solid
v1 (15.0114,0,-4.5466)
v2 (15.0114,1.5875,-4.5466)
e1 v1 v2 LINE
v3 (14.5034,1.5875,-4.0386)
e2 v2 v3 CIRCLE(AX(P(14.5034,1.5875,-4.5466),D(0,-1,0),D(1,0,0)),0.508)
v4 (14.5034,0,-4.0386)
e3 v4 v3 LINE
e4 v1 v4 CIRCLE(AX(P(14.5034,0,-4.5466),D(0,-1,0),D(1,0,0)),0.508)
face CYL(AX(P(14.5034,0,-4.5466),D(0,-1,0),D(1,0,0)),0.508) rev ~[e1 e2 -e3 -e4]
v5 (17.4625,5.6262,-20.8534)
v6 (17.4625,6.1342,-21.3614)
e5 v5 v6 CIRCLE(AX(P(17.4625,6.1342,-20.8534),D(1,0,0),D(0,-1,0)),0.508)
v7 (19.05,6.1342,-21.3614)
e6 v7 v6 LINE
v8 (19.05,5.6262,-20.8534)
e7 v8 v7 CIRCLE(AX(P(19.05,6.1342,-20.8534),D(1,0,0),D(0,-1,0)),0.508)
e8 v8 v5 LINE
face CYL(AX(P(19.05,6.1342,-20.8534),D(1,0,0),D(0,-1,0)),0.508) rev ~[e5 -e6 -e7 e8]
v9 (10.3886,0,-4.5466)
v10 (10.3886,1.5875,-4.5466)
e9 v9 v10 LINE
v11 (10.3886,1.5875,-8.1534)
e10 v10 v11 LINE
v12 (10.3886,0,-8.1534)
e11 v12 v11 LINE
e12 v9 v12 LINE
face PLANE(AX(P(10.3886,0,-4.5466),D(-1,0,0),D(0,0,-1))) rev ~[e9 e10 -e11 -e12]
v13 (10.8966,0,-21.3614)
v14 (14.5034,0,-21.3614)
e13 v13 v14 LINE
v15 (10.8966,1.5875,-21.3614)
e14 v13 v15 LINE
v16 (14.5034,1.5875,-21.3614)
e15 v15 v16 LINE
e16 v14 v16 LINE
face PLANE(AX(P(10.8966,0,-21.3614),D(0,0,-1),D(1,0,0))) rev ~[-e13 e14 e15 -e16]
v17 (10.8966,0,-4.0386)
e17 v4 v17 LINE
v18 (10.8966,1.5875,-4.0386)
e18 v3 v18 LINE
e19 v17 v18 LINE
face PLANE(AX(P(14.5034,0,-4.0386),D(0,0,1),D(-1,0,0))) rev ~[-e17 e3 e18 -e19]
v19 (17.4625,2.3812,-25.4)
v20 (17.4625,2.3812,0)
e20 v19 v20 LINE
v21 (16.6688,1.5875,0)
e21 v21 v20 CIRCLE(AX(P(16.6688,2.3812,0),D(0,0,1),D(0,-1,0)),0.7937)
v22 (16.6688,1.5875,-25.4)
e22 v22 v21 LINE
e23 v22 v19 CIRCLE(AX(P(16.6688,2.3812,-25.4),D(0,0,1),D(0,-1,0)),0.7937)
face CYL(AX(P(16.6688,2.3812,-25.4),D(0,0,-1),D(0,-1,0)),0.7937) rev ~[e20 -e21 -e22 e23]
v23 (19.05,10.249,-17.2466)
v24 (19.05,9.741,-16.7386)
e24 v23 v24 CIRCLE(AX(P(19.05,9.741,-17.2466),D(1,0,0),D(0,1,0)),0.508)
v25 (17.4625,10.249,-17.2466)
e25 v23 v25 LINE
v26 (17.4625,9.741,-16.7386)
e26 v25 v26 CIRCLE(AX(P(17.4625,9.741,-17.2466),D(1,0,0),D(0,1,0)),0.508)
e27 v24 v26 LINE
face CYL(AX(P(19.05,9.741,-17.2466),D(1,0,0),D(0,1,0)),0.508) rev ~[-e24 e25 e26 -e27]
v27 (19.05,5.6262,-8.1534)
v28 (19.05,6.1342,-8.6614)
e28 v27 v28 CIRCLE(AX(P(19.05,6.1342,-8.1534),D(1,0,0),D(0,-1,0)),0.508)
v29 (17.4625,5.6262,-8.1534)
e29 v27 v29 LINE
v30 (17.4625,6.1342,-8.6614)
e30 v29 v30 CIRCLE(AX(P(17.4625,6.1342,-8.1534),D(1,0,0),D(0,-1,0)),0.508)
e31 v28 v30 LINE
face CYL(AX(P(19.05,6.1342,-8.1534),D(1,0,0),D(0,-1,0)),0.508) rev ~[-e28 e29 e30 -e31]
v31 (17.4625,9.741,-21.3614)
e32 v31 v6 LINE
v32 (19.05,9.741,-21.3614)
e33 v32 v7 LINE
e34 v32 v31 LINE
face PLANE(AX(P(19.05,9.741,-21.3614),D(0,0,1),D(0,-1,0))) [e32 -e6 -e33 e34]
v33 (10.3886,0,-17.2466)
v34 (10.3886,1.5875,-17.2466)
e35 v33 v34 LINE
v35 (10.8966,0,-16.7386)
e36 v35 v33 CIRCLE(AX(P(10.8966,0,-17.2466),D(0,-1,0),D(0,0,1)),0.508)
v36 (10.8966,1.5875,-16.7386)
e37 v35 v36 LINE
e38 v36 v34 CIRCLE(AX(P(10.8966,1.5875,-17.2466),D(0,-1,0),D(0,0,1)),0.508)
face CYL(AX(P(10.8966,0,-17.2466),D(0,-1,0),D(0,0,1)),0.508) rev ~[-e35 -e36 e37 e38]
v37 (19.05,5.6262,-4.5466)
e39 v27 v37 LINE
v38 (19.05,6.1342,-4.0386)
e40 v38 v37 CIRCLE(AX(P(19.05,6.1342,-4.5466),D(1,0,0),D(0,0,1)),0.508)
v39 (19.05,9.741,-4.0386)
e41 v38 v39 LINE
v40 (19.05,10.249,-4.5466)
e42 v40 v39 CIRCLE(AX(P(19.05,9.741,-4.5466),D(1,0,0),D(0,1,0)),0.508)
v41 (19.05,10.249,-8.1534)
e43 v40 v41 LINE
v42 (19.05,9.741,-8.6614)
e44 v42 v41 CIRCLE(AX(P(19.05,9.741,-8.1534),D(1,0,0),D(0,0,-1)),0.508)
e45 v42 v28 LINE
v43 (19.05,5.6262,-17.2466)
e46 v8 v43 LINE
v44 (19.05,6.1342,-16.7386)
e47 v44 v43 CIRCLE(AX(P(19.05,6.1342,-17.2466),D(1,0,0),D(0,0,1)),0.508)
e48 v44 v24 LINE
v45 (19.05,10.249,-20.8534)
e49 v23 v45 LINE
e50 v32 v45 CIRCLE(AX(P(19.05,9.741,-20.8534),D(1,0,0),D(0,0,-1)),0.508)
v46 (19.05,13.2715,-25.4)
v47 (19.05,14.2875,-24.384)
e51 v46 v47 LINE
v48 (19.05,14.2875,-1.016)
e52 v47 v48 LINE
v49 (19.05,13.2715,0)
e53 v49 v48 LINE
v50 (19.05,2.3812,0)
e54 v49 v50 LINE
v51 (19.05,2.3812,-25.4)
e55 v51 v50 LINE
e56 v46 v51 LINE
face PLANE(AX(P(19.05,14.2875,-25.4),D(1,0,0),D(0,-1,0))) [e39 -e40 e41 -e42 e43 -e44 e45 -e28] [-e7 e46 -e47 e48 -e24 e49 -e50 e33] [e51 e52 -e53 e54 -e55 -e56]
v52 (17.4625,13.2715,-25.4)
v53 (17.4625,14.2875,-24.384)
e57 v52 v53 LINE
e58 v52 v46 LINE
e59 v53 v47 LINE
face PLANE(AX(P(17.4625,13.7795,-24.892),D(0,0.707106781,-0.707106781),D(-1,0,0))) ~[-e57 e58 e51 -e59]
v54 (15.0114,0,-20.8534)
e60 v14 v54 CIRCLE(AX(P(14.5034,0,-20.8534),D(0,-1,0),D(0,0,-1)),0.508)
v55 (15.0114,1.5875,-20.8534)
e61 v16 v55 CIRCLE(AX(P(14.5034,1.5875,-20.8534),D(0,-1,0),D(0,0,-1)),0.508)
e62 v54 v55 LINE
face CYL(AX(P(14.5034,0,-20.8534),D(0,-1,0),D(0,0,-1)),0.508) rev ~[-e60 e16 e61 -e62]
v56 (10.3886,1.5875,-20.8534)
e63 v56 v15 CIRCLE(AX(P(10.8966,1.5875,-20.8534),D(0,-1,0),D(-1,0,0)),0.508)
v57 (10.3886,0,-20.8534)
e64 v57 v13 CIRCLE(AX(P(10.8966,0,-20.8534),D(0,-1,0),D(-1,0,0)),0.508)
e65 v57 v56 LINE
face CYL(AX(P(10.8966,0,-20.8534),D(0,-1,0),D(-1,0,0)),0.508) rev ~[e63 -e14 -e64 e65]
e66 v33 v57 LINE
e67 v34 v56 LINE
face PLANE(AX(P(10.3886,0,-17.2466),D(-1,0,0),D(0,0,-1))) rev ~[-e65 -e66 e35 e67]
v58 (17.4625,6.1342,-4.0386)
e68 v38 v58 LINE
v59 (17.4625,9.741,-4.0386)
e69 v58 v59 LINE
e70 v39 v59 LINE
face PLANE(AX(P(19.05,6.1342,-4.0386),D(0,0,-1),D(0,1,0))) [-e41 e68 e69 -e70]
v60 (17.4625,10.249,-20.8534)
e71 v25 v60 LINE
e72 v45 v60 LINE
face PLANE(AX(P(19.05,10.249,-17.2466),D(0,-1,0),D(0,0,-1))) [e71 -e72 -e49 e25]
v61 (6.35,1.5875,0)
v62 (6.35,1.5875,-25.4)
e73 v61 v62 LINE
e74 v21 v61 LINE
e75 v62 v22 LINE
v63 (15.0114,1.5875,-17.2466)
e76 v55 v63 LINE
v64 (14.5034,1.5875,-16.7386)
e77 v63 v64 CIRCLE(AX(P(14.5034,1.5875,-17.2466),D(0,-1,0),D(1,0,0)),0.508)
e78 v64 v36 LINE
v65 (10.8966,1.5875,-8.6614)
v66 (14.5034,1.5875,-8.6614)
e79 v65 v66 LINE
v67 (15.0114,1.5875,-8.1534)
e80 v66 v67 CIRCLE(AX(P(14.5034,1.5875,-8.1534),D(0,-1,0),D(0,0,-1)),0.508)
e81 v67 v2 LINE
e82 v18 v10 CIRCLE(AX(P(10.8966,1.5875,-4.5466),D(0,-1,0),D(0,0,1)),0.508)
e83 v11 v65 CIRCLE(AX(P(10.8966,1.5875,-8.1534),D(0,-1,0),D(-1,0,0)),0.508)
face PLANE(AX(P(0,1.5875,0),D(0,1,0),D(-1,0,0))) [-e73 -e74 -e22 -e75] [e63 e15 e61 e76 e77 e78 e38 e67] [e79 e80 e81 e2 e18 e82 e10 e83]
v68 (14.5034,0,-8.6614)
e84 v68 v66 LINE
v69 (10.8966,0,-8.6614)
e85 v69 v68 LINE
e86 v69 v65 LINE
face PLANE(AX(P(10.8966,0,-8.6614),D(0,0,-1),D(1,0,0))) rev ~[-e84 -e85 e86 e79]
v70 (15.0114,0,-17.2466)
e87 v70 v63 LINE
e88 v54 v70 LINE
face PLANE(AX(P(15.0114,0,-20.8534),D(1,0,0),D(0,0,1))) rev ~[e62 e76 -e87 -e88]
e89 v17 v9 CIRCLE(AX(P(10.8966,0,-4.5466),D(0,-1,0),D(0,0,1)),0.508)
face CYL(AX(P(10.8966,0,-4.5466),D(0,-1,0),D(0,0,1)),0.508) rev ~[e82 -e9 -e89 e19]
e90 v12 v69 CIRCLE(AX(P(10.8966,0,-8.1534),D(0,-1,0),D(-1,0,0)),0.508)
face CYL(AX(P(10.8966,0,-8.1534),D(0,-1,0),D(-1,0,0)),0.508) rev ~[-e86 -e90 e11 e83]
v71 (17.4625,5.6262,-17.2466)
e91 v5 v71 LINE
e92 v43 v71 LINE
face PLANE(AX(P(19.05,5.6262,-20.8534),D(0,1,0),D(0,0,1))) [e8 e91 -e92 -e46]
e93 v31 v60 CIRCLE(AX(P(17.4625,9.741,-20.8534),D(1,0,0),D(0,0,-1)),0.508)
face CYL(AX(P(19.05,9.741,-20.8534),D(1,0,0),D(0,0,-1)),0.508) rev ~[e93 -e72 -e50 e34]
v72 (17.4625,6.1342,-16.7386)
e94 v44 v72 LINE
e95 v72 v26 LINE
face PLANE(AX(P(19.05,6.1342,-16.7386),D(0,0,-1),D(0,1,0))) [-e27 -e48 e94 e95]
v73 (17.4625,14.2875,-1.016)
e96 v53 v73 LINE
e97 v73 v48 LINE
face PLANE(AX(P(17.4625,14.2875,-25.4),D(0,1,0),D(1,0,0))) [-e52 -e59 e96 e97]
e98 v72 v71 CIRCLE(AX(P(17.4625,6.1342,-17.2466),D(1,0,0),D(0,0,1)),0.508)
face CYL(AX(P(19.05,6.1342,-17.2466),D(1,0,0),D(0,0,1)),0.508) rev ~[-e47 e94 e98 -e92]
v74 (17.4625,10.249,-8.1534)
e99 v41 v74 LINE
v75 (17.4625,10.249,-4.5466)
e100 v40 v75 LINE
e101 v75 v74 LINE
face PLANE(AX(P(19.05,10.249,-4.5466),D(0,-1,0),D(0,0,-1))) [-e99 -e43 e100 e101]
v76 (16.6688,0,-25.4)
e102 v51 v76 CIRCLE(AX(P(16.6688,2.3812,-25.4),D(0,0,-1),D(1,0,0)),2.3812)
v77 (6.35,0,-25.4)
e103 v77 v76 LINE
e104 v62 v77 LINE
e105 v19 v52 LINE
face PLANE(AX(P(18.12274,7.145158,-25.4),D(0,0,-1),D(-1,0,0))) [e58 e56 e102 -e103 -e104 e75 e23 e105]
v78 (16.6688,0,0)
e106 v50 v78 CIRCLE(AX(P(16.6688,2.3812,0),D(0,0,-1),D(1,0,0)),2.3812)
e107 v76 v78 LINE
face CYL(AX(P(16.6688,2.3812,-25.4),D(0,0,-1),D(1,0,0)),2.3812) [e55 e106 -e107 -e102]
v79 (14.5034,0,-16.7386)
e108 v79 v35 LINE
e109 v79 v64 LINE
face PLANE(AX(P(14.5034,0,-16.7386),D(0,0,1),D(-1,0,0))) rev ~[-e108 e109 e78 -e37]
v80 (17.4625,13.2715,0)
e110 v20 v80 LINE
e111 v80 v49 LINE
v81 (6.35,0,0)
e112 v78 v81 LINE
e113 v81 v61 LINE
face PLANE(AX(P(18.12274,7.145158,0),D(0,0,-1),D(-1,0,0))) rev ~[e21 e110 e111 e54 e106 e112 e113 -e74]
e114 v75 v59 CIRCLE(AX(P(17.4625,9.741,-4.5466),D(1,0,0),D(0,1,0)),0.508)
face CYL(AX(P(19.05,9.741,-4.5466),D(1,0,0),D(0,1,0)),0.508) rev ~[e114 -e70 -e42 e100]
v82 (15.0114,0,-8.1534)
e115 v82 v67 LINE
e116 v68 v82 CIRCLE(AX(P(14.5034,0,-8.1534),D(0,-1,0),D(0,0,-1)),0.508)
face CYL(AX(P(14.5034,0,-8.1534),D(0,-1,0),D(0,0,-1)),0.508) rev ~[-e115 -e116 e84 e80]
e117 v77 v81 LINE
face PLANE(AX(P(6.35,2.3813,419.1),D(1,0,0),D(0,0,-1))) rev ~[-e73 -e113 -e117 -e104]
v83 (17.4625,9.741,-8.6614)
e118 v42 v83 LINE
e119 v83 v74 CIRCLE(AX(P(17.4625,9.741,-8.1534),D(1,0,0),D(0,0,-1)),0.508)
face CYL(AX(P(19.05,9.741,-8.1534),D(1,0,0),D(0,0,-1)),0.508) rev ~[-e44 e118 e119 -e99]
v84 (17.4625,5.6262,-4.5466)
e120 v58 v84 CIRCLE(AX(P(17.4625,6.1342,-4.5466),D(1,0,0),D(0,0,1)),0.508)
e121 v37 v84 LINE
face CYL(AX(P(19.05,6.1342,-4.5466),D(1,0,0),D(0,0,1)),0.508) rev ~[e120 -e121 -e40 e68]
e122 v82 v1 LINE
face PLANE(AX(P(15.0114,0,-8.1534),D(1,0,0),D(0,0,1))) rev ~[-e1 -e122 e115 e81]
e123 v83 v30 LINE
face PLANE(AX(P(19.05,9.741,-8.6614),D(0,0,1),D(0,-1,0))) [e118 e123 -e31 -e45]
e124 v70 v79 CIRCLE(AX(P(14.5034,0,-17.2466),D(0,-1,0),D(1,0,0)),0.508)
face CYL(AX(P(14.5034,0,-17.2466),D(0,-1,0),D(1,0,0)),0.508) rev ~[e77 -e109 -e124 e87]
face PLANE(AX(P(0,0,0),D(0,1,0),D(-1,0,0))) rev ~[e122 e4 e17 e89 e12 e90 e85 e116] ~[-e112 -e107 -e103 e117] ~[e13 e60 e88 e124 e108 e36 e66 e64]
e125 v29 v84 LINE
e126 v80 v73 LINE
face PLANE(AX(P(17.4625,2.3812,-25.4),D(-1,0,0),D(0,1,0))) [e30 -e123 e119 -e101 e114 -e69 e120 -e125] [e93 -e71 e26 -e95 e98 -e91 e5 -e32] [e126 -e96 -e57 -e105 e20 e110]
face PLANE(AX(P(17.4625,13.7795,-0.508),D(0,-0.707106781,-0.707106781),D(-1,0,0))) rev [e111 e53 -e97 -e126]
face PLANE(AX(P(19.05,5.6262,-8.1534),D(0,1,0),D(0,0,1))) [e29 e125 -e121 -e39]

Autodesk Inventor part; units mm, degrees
ref_plane "YZ Plane" through (0, 0, 0) normal (1, 0, 0) x (0, 1, 0)
ref_plane "XZ Plane" through (0, 0, 0) normal (0, 1, 0) x (-1, 0, 0)
sketch "Sketch1" plane through (0, 0, 0) normal (0, 1, 0) x (-1, 0, 0)
  line L0 (-19.05, 0) -> (19.05, 0)
  line L1 (19.05, 0) -> (19.05, -25.4)
  line L2 (19.05, -25.4) -> (-19.05, -25.4)
  line L3 (-19.05, -25.4) -> (-19.05, 0)
  line L4 (19.05, 0) -> (-19.05, -25.4) construction
  point P0 (0, 0)
  point P1 (0, 0)
  dimension "d0" = 38.1
  dimension "d1" = 25.4
extrude "Plate1" add sketch "Sketch1" along normal blind 1.5875
sketch "Sketch2" plane through (17.4625, 0, -25.4) normal (1, 0, 0) x (0, 1, 0)
  line L0 (0, 25.4) -> (0, 0)
  line L1 (0, 0) -> (14.2875, 0)
  line L2 (14.2875, 0) -> (14.2875, 25.4)
  line L3 (14.2875, 25.4) -> (0, 25.4)
edge flange "Flanges" height 12.7 angle 90 thickness 1.5875 bend radius 0.7937 thickness toward (1, 0, 0) relief tear relief width 1.5875 relief depth 0.7937 corner gap 1.5875 corner form 0 edges at (19.05, 1.5875, -12.7) (-19.05, 1.5875, -12.7) wall of the first edge with corners at (17.4625, 0, 0) (17.4625, 0, -25.4) (17.4625, 14.2875, -25.4) (17.4625, 14.2875, 0)
bend "Bend1"
corner "Corner1"
sketch "Sketch3" plane through (19.05, 2.3813, -25.4) normal (1, 0, 0) x (0, 0, -1)
  line L0 (-20.8534, 7.8677) -> (-17.2466, 7.8677)
  line L1 (-16.7386, 7.3597) -> (-16.7386, 3.7529)
  line L2 (-17.2466, 3.2449) -> (-20.8534, 3.2449)
  line L3 (-21.3614, 3.7529) -> (-21.3614, 7.3597)
  arc A0 (-20.8534, 7.8677) -> (-21.3614, 7.3597) centre (-20.8534, 7.3597) ccw
  arc A1 (-16.7386, 7.3597) -> (-17.2466, 7.8677) centre (-17.2466, 7.3597) ccw
  arc A2 (-17.2466, 3.2449) -> (-16.7386, 3.7529) centre (-17.2466, 3.7529) ccw
  arc A3 (-21.3614, 3.7529) -> (-20.8534, 3.2449) centre (-20.8534, 3.7529) ccw
  line L4 (-25.4, 0) -> (-25.4, 11.9063) construction
  line L5 (-25.4, 11.9063) -> (0, 11.9062) construction
  line L6 (-20.8534, 7.3597) -> (-17.2466, 3.7529) construction
  point P0 (-25.4, -2.3812)
  point P1 (-16.7386, 3.2449)
  point P2 (-21.3614, 3.2449)
  point P3 (-19.05, 5.5563)
  dimension "d16" = 4.6228
  dimension "d17" = 0.508
  dimension "d20" = 6.35
  dimension "d21" = 6.35
extrude "Flange Stamp" cut sketch "Sketch3" against normal blind 1.5875
sketch "Sketch7" plane through (19.05, 2.3813, 0) normal (1, 0, 0) x (0, 0, -1)
  arc A0 (4.5466, 7.8677) -> (4.0386, 7.3597) centre (4.5466, 7.3597) ccw construction
  arc A1 (8.1534, 3.2449) -> (8.6614, 3.7529) centre (8.1534, 3.7529) ccw construction
  circle A2 centre (6.35, 5.5563) radius 2.1844
  line L0 (4.5466, 7.3597) -> (8.1534, 3.7529) construction
  point P0 (0, -2.3812)
  dimension "d46" = 4.3688
surface extrude "Flange Circle" sketch "Sketch7" against normal up to surface (1.5875 mm away) shown yes curves A2
ref_plane "Flange Pattern Plane" through (19.05, 7.9375, -4.5466) normal (0, 1, 0) x (1, 0, 0)
sketch "Flange Pattern Sketch" plane through (19.05, 7.9375, -4.5466) normal (0, 1, 0) x (1, 0, 0)
  line L0 (0, 3.6068) -> (0, 0) construction
  line L1 (-45.8186, -4.5466) -> (8.2118, -4.5466) construction
  line L2 (0, 0) -> (-1.5875, 0) construction
  point P0 (-19.05, -4.5466)
  point P1 (0, 1.8034)
  point P2 (0, 14.5034)
  dimension "d131" = 12.7
  dimension "d134" = 12.7
pattern_sketch "Flange Pattern" of "Flange Circle", "Flange Stamp" from (19.05, 7.9375, -6.35) copies at (19.05, 7.9375, -19.05)
sketch "Sketch8" plane through (0, 0, 0) normal (0, -1, 0) x (1, 0, 0)
  line L0 (16.6687, 0) -> (-16.6687, 0) construction
  line L1 (14.5034, -4.0386) -> (10.8966, -4.0386)
  line L2 (10.3886, -4.5466) -> (10.3886, -8.1534)
  line L3 (10.8966, -8.6614) -> (14.5034, -8.6614)
  line L4 (15.0114, -8.1534) -> (15.0114, -4.5466)
  arc A0 (15.0114, -4.5466) -> (14.5034, -4.0386) centre (14.5034, -4.5466) ccw
  arc A1 (14.5034, -8.6614) -> (15.0114, -8.1534) centre (14.5034, -8.1534) ccw
  arc A2 (10.3886, -8.1534) -> (10.8966, -8.6614) centre (10.8966, -8.1534) ccw
  arc A3 (10.8966, -4.0386) -> (10.3886, -4.5466) centre (10.8966, -4.5466) ccw
  line L5 (14.5034, -4.5466) -> (10.8966, -8.1534) construction
  line L6 (19.05, 0) -> (19.05, -25.4) construction
  point P0 (0, 0)
  point P1 (10.3886, -8.6614)
  point P2 (15.0114, -8.6614)
  point P3 (12.7, -6.35)
  dimension "d49" = 4.6228
  dimension "d50" = 0.508
  dimension "d51" = 6.35
  dimension "d52" = 6.35
extrude "Body Stamp" cut sketch "Sketch8" against normal blind 1.5875
sketch "Sketch9" plane through (0, 0, 0) normal (0, -1, 0) x (1, 0, 0)
  arc A0 (15.0114, -4.5466) -> (14.5034, -4.0386) centre (14.5034, -4.5466) ccw construction
  arc A1 (10.3886, -8.1534) -> (10.8966, -8.6614) centre (10.8966, -8.1534) ccw construction
  line L0 (14.5034, -4.5466) -> (10.8966, -8.1534) construction
  circle A2 centre (12.7, -6.35) radius 2.1844
  point P0 (0, 0)
  dimension "d55" = 4.3688
surface extrude "Body Circle" sketch "Sketch9" against normal up to surface (1.5875 mm away) shown yes curves A2
sketch "Body Pattern Sketch" plane through (0, 0, 0) normal (0, -1, 0) x (1, 0, 0)
  line L0 (16.6687, 0) -> (-16.6687, 0) construction
  line L1 (19.05, 0) -> (19.05, -25.4) construction
  circle A0 centre (12.7, -6.35) radius 2.1844 construction
  point P0 (0, 0)
  point P1 (12.7, -19.05)
  dimension "d62" = 12.7
  dimension "d65" = 12.7
  dimension "d139" = 12.7
pattern_sketch "Body Pattern" of "Body Stamp", "Body Circle" from (12.7, 0, -6.35) copies at (12.7, 0, -19.05)
sketch "Arc Length" plane through (17.4625, 2.3813, 0) normal (0, 0, 1) x (1, 0, 0)
  line L0 (0, 0) -> (1.5875, 0) construction
  arc A0 (-0.7937, -0.7938) -> (0, 0) centre (-0.7937, 0) ccw construction
  line L1 (-0.7938, -2.3813) -> (-0.7937, -0.7938) construction
  arc A1 (-0.7938, -2.3813) -> (1.5875, 0) centre (-0.7937, 0) ccw construction
  point P0 (-17.4625, -2.3812)
  dimension "d85" = 3.7405
  dimension "d92" = 1.2468
sketch "Sketch13" plane through (19.05, 14.2875, 0) normal (1, 0, 0) x (0, 0, -1)
  line L0 (0, 0) -> (25.4, 0) construction
  line L1 (62.4078, 0) -> (63.4238, -1.016)
  line L2 (63.4238, -1.016) -> (64.4398, 0)
  line L3 (62.4078, 0) -> (64.4398, 0)
  line L4 (25.4, -11.9062) -> (0, -11.9062) construction
  line L5 (63.4238, -10.8903) -> (61.161, -13.1531)
  line L6 (61.161, -13.1531) -> (63.4238, -15.4159)
  line L7 (63.4238, -15.4159) -> (65.6866, -13.1531)
  line L8 (65.6866, -13.1531) -> (63.4238, -10.8903)
  line L9 (63.4238, -10.8903) -> (63.4238, -15.4159) construction
  line L10 (63.4238, -1.016) -> (63.4238, -10.8903) construction
  line L11 (0, -11.9062) -> (25.4, -11.9062) construction
  point P0 (0, -14.2875)
  dimension "d86" = 4.5256
  dimension "d88" = 1.016
  dimension "d91" = 1.016
  dimension "d102" = 63.4238
feature "Notch" [suppressed]
mirror "Notch Mirror" [suppressed]
pattern_linear "Notch Pattern" [suppressed]
chamfer "End Chamfer" distance 1.016 angle 45 4 edges at (-18.2562, 14.2875, -25.4) (18.2563, 14.2875, -25.4) (-18.2562, 14.2875, 0) (18.2562, 14.2875, 0)
sketch "Sketch14" plane through (-19.05, 2.3813, 419.1) normal (1, 0, 0) x (0, 0, -1)
  line L0 (419.1, 11.9063) -> (444.5, 11.9063) construction
  line L1 (419.1, 0) -> (419.1, 11.9063) construction
  line L2 (419.1, -2.3813) -> (444.5, -2.3813) construction
  line L3 (419.1, 11.9063) -> (444.5, 11.9063)
  line L4 (444.5, 11.9063) -> (444.5, -2.3813)
  line L5 (444.5, -2.3813) -> (419.1, -2.3813)
  line L6 (419.1, -2.3813) -> (419.1, 11.9063)
  point P0 (419.1, -2.3812)
  point P1 (382.0521, -1.9844)
extrude "Half Cut" cut sketch "Sketch14" along normal blind 25.4
equation "\"d1\" = 12.7 * Length"
equation "\"d18\" = Thickness"
equation "\"d53\" = Thickness"
equation "\"d89\" = Thickness"
equation "\"d2\" = Thickness"
equation "\"d3\" = BendReliefWidth"
equation "\"d4\" = BendReliefDepth"
equation "\"d5\" = MinimumRemnant"
equation "\"d6\" = TransitionRadius"
equation "\"d10\" = CornerReliefSize"
equation "\"d11\" = GapSize"
equation "\"d12\" = JacobiRadiusSize"
equation "\"BendRadius\" = Thickness"
equation "\"BendReliefWidth\" = Thickness"
equation "\"BendReliefDepth\" = 0.5 * Thickness"
equation "\"CornerReliefSize\" = 4 * Thickness"
equation "\"MinimumRemnant\" = 2 * Thickness"
equation "\"TransitionRadius\" = BendRadius"
equation "\"JacobiRadiusSize\" = BendRadius"
equation "\"GapSize\" = Thickness"
equation "\"Length\" = 2"
equation "\"Thickness\" = 1.5875"
properties part number "Alu C 1x3x1x35"
